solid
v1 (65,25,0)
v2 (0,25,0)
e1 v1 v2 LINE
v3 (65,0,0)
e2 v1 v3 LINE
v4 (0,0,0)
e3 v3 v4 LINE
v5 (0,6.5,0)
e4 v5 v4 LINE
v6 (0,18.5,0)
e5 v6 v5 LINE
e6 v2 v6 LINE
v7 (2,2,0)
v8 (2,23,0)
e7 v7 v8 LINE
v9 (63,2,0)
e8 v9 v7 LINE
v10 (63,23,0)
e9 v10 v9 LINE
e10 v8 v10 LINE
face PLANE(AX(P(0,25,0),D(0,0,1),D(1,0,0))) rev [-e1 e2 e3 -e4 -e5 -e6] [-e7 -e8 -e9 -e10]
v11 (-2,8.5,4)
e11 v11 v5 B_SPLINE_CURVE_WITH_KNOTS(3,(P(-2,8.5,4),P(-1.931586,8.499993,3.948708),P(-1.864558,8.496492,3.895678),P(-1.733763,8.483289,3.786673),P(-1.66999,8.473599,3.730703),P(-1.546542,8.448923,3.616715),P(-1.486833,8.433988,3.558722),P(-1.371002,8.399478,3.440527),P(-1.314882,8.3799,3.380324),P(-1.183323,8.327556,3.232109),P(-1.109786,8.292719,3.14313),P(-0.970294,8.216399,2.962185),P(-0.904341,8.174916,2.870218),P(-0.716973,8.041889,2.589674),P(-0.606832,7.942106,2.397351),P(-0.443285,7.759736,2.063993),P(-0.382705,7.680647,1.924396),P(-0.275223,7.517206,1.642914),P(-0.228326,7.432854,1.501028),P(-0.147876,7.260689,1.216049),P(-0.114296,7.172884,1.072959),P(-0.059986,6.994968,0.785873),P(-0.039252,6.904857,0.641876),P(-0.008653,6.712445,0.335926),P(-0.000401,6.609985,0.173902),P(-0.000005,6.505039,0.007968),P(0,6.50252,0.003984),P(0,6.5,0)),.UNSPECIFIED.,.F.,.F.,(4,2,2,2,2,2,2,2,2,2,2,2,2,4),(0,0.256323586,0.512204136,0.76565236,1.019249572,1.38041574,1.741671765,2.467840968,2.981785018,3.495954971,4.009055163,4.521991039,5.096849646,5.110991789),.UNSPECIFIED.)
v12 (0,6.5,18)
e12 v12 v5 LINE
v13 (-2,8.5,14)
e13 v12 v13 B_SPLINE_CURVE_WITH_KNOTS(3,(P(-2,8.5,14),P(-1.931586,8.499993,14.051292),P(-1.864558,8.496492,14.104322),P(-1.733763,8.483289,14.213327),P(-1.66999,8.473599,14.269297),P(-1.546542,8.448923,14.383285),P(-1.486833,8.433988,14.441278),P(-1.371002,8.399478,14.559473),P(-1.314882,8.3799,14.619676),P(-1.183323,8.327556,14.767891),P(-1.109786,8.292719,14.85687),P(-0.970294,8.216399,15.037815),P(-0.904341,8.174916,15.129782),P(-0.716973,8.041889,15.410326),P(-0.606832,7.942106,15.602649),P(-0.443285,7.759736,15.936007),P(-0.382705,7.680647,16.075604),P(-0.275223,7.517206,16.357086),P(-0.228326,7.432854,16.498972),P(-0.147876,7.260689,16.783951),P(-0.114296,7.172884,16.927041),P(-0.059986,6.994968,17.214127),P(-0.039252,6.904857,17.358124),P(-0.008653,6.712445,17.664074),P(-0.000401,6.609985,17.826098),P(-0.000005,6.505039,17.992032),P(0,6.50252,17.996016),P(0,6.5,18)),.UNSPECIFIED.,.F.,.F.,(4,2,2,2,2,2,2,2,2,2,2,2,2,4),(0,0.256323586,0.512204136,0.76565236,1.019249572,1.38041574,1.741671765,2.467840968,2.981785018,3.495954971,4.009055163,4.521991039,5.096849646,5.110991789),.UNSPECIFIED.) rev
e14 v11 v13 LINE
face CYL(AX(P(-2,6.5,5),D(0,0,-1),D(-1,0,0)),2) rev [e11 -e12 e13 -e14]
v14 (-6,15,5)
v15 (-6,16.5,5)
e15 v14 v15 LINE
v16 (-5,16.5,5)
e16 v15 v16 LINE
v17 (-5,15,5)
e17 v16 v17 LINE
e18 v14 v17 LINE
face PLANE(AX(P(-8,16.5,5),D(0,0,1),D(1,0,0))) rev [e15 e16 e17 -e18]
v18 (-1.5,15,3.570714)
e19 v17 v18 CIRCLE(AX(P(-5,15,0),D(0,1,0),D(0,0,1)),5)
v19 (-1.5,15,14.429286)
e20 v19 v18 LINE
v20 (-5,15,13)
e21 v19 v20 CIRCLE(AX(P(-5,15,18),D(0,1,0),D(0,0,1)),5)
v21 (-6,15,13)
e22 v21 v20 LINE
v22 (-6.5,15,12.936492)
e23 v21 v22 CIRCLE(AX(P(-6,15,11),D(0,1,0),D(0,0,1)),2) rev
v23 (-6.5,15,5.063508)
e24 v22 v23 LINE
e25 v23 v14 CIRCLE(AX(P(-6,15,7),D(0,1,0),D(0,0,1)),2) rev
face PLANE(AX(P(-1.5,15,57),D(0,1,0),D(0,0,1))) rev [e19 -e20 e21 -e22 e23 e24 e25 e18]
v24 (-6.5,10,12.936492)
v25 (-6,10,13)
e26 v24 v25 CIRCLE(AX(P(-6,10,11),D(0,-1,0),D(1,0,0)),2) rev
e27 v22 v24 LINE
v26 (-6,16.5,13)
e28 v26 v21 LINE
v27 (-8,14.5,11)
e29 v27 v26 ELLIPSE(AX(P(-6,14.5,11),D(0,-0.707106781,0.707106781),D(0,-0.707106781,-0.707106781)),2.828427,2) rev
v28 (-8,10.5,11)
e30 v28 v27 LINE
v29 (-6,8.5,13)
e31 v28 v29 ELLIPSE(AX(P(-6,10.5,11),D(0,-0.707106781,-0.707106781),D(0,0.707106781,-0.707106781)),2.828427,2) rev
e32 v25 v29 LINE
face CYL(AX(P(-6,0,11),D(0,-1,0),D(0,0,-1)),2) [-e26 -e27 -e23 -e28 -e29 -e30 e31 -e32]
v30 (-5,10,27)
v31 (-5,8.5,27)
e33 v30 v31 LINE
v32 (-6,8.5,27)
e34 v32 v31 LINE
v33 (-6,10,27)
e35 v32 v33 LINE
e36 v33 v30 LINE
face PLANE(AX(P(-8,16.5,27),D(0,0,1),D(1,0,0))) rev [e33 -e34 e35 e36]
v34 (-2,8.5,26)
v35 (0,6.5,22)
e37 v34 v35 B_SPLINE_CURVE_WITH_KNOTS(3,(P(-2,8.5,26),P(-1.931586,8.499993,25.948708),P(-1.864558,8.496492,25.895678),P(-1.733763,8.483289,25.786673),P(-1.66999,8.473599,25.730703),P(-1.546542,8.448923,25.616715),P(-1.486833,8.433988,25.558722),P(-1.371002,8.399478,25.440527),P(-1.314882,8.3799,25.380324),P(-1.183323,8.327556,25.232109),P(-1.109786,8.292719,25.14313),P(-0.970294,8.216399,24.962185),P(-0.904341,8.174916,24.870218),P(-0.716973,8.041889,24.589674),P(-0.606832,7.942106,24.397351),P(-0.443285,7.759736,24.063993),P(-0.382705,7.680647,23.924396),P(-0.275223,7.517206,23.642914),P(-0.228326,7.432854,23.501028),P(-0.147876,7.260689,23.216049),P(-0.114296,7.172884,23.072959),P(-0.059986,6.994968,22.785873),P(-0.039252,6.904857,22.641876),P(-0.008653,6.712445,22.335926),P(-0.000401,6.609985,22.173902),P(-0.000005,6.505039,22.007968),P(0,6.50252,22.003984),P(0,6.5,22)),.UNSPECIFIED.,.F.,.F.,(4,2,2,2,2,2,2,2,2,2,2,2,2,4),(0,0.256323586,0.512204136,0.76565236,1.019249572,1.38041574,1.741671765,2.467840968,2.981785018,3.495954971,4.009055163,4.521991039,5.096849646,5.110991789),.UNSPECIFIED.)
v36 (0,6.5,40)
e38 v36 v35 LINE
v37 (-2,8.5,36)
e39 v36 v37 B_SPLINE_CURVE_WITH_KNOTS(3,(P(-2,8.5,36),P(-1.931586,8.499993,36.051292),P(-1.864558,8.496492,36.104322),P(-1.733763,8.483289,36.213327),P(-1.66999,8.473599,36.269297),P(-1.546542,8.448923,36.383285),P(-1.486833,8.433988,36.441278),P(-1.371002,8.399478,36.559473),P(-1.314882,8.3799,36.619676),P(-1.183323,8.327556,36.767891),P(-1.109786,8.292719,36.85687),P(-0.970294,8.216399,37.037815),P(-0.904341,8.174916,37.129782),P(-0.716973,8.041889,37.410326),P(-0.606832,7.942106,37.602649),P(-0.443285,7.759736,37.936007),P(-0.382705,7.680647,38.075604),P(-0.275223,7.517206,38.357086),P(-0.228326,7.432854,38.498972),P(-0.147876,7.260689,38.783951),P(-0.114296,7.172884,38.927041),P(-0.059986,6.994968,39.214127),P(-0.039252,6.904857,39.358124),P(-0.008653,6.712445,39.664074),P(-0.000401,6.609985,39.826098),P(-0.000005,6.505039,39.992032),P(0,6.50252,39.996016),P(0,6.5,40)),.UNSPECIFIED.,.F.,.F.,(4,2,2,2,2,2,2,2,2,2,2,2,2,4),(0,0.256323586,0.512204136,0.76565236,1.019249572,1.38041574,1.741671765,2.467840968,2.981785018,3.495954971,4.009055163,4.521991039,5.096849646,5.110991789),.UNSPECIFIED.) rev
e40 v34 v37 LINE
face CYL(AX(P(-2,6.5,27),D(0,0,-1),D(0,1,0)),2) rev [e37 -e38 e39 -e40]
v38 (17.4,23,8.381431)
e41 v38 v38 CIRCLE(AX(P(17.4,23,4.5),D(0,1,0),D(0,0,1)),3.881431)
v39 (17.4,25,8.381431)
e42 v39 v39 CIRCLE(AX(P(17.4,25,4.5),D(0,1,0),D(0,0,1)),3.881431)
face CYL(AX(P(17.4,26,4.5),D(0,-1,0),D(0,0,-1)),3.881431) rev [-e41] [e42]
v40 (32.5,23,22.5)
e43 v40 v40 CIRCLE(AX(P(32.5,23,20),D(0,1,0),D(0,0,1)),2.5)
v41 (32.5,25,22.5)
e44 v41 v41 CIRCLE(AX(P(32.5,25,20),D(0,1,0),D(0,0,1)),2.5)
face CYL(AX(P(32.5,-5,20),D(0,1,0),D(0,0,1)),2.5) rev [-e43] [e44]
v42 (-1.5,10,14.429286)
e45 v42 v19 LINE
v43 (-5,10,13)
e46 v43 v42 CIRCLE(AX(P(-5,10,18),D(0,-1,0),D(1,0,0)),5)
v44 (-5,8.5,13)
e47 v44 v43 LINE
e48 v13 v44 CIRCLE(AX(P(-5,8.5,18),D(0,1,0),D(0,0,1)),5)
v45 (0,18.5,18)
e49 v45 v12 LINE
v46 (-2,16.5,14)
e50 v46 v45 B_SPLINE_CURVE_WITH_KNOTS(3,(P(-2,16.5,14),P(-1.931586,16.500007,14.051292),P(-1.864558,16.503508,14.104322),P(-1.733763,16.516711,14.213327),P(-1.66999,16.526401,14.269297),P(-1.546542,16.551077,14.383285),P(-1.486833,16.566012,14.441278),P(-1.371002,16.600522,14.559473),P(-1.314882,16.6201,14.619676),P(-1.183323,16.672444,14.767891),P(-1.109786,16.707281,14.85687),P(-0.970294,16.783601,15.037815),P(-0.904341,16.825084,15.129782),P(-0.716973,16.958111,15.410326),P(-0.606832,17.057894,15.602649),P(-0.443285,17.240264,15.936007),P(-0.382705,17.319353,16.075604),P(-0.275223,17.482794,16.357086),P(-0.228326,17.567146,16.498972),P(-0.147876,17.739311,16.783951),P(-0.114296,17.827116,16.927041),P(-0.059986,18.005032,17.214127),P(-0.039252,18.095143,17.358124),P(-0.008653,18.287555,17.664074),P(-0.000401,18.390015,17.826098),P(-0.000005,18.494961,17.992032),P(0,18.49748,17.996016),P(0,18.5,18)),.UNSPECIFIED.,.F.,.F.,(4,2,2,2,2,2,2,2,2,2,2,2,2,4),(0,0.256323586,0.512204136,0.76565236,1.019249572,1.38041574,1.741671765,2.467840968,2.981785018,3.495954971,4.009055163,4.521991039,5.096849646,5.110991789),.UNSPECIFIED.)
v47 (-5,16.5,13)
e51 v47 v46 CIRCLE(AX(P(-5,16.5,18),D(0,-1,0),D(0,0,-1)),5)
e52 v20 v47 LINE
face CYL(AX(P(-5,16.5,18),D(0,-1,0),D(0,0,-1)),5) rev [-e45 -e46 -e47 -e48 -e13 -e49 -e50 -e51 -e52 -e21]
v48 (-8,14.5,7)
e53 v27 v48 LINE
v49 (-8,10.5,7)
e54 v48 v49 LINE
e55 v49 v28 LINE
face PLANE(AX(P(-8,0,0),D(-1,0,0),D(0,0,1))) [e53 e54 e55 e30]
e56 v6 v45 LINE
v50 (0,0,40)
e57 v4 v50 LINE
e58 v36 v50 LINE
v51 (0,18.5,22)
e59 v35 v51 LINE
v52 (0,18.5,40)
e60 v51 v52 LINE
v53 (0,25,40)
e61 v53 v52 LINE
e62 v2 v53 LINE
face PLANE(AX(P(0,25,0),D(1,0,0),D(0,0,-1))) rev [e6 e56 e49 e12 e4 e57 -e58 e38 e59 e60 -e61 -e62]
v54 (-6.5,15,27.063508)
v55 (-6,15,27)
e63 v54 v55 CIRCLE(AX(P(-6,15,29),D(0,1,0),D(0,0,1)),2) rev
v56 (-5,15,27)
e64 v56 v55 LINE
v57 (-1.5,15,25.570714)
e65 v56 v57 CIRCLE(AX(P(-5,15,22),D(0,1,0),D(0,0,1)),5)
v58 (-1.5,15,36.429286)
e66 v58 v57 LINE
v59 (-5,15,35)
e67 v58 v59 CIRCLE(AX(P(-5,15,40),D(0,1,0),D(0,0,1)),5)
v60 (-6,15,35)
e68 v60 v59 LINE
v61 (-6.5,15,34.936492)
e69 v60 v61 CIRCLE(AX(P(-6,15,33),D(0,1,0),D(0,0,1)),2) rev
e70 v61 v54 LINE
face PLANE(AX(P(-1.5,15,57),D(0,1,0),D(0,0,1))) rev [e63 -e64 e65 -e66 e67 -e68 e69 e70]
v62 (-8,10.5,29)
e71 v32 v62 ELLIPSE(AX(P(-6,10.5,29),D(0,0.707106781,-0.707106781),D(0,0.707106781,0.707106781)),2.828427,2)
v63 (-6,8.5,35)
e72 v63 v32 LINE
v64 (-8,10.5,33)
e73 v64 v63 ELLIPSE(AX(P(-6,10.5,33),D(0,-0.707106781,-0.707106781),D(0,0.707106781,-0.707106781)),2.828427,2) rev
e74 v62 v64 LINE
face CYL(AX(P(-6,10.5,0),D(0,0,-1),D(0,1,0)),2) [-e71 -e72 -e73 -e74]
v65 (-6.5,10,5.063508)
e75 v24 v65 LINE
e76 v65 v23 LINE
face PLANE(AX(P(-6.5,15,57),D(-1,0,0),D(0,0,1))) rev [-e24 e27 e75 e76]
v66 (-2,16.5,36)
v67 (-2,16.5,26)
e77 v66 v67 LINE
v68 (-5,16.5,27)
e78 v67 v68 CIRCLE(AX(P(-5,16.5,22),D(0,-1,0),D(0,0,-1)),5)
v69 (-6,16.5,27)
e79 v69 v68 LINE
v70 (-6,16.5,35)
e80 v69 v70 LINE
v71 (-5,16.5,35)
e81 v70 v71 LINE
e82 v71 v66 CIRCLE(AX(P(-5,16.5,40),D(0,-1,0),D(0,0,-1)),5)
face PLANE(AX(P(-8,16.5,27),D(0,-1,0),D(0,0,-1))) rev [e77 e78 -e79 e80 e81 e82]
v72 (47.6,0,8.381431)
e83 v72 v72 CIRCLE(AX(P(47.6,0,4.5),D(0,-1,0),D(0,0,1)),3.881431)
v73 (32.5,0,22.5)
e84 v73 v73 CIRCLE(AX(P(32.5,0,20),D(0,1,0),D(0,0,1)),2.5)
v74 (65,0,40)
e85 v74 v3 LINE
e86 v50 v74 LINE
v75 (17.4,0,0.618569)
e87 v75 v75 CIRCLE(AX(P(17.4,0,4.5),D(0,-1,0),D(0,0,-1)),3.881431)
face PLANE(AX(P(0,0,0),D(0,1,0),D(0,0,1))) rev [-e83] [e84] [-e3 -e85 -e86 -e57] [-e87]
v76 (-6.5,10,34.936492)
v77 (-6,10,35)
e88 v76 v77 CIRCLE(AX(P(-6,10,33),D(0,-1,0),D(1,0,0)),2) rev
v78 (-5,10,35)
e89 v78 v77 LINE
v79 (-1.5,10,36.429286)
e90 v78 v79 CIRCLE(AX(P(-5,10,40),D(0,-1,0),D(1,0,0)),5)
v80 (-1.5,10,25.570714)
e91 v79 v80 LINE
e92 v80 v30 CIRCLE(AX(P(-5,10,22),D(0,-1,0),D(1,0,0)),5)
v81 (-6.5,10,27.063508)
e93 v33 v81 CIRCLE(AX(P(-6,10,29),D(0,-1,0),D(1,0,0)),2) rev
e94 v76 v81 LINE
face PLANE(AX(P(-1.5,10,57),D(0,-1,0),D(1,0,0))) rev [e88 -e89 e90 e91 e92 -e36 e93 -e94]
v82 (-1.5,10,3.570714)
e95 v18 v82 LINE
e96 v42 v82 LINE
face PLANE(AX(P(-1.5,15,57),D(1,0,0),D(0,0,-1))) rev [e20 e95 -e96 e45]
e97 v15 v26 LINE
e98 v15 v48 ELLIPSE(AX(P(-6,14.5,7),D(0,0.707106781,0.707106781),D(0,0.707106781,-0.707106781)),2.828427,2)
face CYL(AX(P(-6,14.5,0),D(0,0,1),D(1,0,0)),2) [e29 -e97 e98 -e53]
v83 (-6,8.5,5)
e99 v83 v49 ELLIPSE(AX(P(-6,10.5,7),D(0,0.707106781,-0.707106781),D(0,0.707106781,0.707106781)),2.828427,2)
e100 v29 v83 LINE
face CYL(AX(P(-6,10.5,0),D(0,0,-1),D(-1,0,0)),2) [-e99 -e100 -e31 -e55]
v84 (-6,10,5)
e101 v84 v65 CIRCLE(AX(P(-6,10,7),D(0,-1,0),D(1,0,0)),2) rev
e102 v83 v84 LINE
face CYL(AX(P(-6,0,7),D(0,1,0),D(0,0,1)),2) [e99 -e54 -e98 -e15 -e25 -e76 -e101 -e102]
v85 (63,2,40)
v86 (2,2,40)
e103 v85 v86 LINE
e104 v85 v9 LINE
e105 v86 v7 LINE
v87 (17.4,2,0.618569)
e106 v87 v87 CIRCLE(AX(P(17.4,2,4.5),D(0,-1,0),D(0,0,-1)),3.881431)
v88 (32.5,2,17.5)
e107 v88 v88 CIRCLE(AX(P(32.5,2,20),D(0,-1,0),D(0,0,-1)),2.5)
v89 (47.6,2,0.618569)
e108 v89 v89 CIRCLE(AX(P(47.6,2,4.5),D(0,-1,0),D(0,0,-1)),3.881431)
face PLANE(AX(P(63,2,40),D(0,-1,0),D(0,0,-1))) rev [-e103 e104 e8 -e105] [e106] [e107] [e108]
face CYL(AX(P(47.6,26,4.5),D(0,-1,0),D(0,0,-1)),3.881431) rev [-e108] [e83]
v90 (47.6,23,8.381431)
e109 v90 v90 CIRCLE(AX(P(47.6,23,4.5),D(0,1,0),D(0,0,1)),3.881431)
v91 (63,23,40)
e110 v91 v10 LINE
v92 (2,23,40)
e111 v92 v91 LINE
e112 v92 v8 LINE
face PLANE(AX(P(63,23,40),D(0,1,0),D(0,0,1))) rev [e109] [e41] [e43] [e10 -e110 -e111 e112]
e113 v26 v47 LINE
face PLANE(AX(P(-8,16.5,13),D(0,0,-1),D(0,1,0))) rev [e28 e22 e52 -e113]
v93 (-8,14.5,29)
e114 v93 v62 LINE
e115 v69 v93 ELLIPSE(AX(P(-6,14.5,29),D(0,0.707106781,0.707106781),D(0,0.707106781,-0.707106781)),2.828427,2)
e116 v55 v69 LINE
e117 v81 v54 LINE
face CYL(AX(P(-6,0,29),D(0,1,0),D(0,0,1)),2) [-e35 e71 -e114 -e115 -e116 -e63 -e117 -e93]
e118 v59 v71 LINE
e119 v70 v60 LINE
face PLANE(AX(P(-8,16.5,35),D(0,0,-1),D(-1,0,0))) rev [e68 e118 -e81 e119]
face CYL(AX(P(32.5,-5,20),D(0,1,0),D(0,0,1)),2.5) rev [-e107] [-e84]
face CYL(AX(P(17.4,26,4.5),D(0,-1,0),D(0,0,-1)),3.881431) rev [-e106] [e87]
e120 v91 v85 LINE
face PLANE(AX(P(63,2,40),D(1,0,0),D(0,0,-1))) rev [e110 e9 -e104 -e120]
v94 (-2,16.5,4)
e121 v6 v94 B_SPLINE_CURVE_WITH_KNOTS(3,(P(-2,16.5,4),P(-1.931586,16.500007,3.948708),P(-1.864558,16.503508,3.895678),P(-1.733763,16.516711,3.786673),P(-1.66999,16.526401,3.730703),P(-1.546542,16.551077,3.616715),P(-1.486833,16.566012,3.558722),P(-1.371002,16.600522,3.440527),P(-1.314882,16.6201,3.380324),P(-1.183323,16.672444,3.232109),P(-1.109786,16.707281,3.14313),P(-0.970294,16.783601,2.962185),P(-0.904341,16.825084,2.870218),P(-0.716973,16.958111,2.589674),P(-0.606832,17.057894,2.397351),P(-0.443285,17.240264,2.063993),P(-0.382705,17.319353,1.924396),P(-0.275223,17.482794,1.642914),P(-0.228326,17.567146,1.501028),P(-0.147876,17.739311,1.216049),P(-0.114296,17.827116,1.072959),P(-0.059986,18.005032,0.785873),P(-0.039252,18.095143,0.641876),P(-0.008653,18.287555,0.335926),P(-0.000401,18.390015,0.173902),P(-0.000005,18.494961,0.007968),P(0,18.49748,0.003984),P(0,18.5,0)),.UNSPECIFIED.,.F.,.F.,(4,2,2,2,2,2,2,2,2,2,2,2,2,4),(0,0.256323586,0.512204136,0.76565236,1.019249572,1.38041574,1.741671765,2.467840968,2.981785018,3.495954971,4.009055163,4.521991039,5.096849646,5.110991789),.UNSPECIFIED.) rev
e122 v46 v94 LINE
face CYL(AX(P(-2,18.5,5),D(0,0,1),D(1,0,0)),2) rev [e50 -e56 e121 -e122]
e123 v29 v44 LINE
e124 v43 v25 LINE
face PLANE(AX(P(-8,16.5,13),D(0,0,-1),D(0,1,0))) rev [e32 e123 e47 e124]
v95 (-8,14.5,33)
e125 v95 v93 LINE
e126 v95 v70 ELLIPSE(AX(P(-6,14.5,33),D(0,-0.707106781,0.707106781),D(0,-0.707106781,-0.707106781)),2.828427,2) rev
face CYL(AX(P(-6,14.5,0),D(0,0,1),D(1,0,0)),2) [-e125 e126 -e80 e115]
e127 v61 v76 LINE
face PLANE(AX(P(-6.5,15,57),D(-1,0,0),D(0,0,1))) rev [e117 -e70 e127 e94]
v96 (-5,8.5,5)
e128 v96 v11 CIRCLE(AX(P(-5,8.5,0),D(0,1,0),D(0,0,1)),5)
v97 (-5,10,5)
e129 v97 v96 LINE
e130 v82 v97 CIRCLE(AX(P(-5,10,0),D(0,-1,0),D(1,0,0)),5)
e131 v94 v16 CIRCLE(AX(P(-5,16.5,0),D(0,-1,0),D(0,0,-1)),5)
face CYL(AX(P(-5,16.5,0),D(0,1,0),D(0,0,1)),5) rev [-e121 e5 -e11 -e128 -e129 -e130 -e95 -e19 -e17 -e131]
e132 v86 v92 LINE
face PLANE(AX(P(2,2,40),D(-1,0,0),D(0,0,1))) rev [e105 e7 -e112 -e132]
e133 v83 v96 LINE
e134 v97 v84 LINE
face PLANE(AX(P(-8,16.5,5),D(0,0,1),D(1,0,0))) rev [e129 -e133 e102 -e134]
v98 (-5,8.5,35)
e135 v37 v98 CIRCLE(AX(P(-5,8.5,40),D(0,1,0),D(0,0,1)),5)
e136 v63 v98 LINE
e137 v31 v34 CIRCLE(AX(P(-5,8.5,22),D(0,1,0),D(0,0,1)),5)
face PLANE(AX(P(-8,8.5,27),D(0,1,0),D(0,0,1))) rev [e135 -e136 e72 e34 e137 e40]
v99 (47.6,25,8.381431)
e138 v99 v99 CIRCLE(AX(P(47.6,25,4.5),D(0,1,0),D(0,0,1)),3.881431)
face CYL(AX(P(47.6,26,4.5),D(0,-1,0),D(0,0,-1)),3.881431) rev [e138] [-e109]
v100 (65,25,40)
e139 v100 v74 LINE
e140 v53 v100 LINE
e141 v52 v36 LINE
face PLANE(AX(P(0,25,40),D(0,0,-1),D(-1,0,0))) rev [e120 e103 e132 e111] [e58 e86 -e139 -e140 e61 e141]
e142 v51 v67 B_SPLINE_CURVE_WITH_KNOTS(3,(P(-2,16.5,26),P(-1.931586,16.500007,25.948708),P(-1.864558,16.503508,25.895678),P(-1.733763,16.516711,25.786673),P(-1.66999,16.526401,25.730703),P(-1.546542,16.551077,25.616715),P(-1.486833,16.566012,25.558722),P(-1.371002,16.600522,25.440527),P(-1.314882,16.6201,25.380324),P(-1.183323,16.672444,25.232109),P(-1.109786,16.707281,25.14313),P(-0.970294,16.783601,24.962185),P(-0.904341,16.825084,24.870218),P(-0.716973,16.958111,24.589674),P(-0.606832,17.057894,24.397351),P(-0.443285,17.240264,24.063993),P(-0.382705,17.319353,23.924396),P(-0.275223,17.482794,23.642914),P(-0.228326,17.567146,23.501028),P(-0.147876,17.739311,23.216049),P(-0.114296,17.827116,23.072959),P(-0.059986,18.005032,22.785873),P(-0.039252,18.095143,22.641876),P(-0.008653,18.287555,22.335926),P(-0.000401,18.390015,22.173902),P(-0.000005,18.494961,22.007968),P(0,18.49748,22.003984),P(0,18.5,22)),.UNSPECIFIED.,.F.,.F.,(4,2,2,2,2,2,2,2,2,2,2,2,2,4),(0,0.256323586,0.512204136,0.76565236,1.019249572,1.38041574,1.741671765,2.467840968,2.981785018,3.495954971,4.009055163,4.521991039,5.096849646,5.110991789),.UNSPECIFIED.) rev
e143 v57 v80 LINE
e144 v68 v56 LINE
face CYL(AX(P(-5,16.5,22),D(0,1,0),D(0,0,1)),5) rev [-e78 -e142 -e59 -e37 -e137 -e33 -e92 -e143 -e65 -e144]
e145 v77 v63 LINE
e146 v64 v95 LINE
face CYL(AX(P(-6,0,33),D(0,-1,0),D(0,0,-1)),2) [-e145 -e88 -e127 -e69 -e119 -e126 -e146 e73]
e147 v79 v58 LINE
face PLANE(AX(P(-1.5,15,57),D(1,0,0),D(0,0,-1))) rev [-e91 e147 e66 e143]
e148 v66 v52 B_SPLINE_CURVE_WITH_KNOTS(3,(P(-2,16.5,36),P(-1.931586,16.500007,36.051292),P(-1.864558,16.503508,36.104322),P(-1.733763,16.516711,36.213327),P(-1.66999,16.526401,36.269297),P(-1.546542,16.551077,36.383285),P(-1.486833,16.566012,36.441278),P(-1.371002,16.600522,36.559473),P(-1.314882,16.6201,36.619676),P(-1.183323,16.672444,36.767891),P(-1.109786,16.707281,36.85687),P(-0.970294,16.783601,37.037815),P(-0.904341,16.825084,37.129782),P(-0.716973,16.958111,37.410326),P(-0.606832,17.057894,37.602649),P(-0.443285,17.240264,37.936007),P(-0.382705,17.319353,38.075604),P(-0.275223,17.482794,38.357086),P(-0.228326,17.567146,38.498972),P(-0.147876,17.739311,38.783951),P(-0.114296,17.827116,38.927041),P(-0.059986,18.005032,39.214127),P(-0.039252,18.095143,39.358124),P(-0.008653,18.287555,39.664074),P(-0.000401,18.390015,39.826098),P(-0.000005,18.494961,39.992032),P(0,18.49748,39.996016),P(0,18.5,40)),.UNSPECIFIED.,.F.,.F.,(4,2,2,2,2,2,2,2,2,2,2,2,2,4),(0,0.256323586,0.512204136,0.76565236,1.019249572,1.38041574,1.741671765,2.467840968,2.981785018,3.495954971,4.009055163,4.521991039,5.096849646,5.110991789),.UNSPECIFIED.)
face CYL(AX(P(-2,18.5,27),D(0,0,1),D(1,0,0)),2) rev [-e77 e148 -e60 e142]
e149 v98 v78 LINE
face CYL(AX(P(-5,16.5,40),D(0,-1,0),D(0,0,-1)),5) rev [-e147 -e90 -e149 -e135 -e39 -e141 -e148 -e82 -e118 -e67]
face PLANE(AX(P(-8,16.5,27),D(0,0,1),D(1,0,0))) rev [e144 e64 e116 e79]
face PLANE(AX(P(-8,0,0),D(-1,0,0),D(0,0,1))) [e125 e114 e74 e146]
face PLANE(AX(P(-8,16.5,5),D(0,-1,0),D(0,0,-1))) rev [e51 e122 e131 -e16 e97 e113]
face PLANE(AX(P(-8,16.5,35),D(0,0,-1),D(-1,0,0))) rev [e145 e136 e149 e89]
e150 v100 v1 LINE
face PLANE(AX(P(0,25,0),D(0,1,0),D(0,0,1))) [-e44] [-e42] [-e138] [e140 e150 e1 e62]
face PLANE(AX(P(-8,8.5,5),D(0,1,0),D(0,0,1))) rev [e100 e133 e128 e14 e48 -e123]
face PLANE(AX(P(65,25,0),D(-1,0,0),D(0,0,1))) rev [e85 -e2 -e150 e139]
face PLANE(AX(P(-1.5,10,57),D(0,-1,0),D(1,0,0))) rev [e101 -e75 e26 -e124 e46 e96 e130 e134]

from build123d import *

# Parameters (mm, degrees)
SKETCH1_W           = 65
SKETCH1_H           = 40
BOSS_EXTRUDE1_DEPTH = 25
SKETCH8_W           = 61
SKETCH8_H           = 21
CUT_EXTRUDE1_DEPTH  = 40
SKETCH9_R           = 2.5
CUT_EXTRUDE2_DEPTH  = 30
SKETCH10_R          = 3.881431072
CUT_EXTRUDE3_DEPTH  = 26
SKETCH11_W          = 8
SKETCH11_H          = 8
BOSS_EXTRUDE2_DEPTH = 8
SKETCH12_W          = 5
SKETCH12_H          = 5
CUT_EXTRUDE4_DEPTH  = 52
FILLET1_R           = 2
FILLET2_START       = 6.4999999
FILLET2_DEPTH       = 12.0000001
FILLET2_START_2     = 7.897261538
FILLET2_2_DEPTH     = 2.102738462
FILLET2_START_3     = 15
FILLET2_3_DEPTH     = 2.089446154
FILLET2_START_4     = -1
FILLET2_4_DEPTH     = 42
FILLET3_START       = 5
FILLET3_DEPTH       = 30
FILLET3_START_2     = 8
FILLET3_2_DEPTH     = 9


with BuildPart() as part:
    # Sketch1 → Boss-Extrude1 (new body)
    with BuildSketch(Plane(origin=(0, 0, 0), x_dir=(1, 0, 0), z_dir=(0, 1, 0))):
        with Locations((32.5, -20)):
            Rectangle(SKETCH1_W, SKETCH1_H)
    extrude(amount=BOSS_EXTRUDE1_DEPTH)

    # Sketch8 → Cut-Extrude1 (cut)
    with BuildSketch(Plane(origin=(0, 0, 0), x_dir=(-1, 0, 0), z_dir=(0, 0, -1))):
        with Locations((-32.5, 12.5)):
            Rectangle(SKETCH8_W, SKETCH8_H)
    extrude(amount=-CUT_EXTRUDE1_DEPTH, mode=Mode.SUBTRACT)

    # Sketch9 → Cut-Extrude2 (cut)
    with BuildSketch(Plane(origin=(0, 25, 0), x_dir=(1, 0, 0), z_dir=(0, 1, 0))):
        with Locations(Location((32.5, -20, 0), (0, 0, 270))):
            Circle(SKETCH9_R)
    extrude(amount=-CUT_EXTRUDE2_DEPTH, mode=Mode.SUBTRACT)

    # Sketch10 → Cut-Extrude3 (cut)
    with BuildSketch(Plane.XZ):
        with Locations(Location((17.4, 4.5, 0), (0, 0, 90))):
            Circle(SKETCH10_R)
        with Locations(Location((47.6, 4.5, 0), (0, 0, 90))):
            Circle(SKETCH10_R)
    extrude(amount=-CUT_EXTRUDE3_DEPTH, mode=Mode.SUBTRACT)

    # Sketch11 → Boss-Extrude2 (add)
    with BuildSketch(Plane.ZY):
        with Locations((9, 12.5)):
            Rectangle(SKETCH11_W, SKETCH11_H)
        with Locations((31, 12.5)):
            Rectangle(SKETCH11_W, SKETCH11_H)
    extrude(amount=BOSS_EXTRUDE2_DEPTH)

    # Sketch12 → Cut-Extrude4 (cut)
    with BuildSketch(Plane(origin=(0, 0, 5), x_dir=(-1, 0, 0), z_dir=(0, 0, -1))):
        with Locations((4, 12.5)):
            Rectangle(SKETCH12_W, SKETCH12_H)
    extrude(amount=-CUT_EXTRUDE4_DEPTH, mode=Mode.SUBTRACT)

    # Fillet1
    fillet1_edges = [part.edges().sort_by_distance(p)[0] for p in [
        (0, 8.5, 9),
        (0, 16.5, 9),
        (0, 8.5, 31),
        (0, 16.5, 31),
    ]]
    fillet(fillet1_edges, radius=FILLET1_R)

    # Fillet2: read off the stored shape, not the designer's step
    # Fillet2 outline → Fillet2 (add)
    with BuildSketch(Plane(origin=(0, 0, 0), x_dir=(1, 0, 0), z_dir=(0, 1, 0)).offset(FILLET2_START)):
        with BuildLine():
            ThreePointArc((-1.5, -14.429285786), (-0.390227771, -16.063508327), (0, -18))
            Line((0, -18), (0, -13))
            Line((0, -13), (-1.5, -13))
            Line((-1.5, -13), (-1.5, -14.429285786))
        make_face()
        with BuildLine():
            Line((-1.5, -35), (-1.5, -36.429285786))
            ThreePointArc((-1.5, -36.429285786), (-0.390227771, -38.063508327), (0, -40))
            Line((0, -40), (0, -35))
            Line((0, -35), (-1.5, -35))
        make_face()
        with BuildLine():
            Line((-1.5, -25.570714214), (-1.5, -27))
            Line((-1.5, -27), (0, -27))
            Line((0, -27), (0, -22))
            ThreePointArc((0, -22), (-0.390227771, -23.936491673), (-1.5, -25.570714214))
        make_face()
        with BuildLine():
            Line((-1.5, -5), (0, -5))
            Line((0, -5), (0, 0))
            ThreePointArc((0, 0), (-0.390227771, -1.936491673), (-1.5, -3.570714214))
            Line((-1.5, -3.570714214), (-1.5, -5))
        make_face()
    extrude(amount=FILLET2_DEPTH)

    # Fillet2 2 outline → Fillet2 2 (add)
    with BuildSketch(Plane(origin=(0, 0, 0), x_dir=(1, 0, 0), z_dir=(0, 1, 0)).offset(FILLET2_START_2)):
        with BuildLine():
            ThreePointArc((-5, -35), (-3.109705191, -35.371092404), (-1.5, -36.429285786))
            Line((-1.5, -36.429285786), (-1.5, -35))
            Line((-1.5, -35), (-5, -35))
        make_face()
        with BuildLine():
            Line((-5, -27), (-1.5, -27))
            Line((-1.5, -27), (-1.5, -25.570714214))
            ThreePointArc((-1.5, -25.570714214), (-3.109705191, -26.628907596), (-5, -27))
        make_face()
        with BuildLine():
            ThreePointArc((-5, -13), (-3.109705191, -13.371092404), (-1.5, -14.429285786))
            Line((-1.5, -14.429285786), (-1.5, -13))
            Line((-1.5, -13), (-5, -13))
        make_face()
        with BuildLine():
            Line((-5, -5), (-1.5, -5))
            Line((-1.5, -5), (-1.5, -3.570714214))
            ThreePointArc((-1.5, -3.570714214), (-3.109705191, -4.628907596), (-5, -5))
        make_face()
    extrude(amount=FILLET2_2_DEPTH)

    # Fillet2 3 outline → Fillet2 3 (add)
    with BuildSketch(Plane(origin=(0, 0, 0), x_dir=(1, 0, 0), z_dir=(0, 1, 0)).offset(FILLET2_START_3)):
        with BuildLine():
            ThreePointArc((-5, -35), (-3.109705191, -35.371092404), (-1.5, -36.429285786))
            Line((-1.5, -36.429285786), (-1.5, -35))
            Line((-1.5, -35), (-5, -35))
        make_face()
        with BuildLine():
            Line((-5, -27), (-1.5, -27))
            Line((-1.5, -27), (-1.5, -25.570714214))
            ThreePointArc((-1.5, -25.570714214), (-3.109705191, -26.628907596), (-5, -27))
        make_face()
        with BuildLine():
            ThreePointArc((-5, -13), (-3.109705191, -13.371092404), (-1.5, -14.429285786))
            Line((-1.5, -14.429285786), (-1.5, -13))
            Line((-1.5, -13), (-5, -13))
        make_face()
        with BuildLine():
            Line((-5, -5), (-1.5, -5))
            Line((-1.5, -5), (-1.5, -3.570714214))
            ThreePointArc((-1.5, -3.570714214), (-3.109705191, -4.628907596), (-5, -5))
        make_face()
    extrude(amount=FILLET2_3_DEPTH)

    # Fillet2 4 outline → Fillet2 4 (cut)
    with BuildSketch(Plane.XY.offset(FILLET2_START_4)):
        with BuildLine():
            Line((-5, 16.5), (-2, 16.5))
            ThreePointArc((-2, 16.5), (-0.585786438, 17.085786438), (0, 18.5))
            Line((0, 18.5), (-1.5, 18.5))
            Line((-1.5, 18.5), (-1.5, 17.089446154))
            Line((-1.5, 17.089446154), (-5, 17.089446154))
            Line((-5, 17.089446154), (-5, 16.5))
        make_face()
        with BuildLine():
            Line((-5, 7.897261538), (-1.5, 7.897261538))
            Line((-1.5, 7.897261538), (-1.5, 6.4999999))
            Line((-1.5, 6.4999999), (0, 6.49999995))
            ThreePointArc((0, 6.49999995), (-0.58578642, 7.914213545), (-2, 8.5))
            Line((-2, 8.5), (-5, 8.5))
            Line((-5, 8.5), (-5, 7.897261538))
        make_face()
    extrude(amount=FILLET2_4_DEPTH, mode=Mode.SUBTRACT)

    # Fillet3: read off the stored shape, not the designer's step
    # Fillet3 outline → Fillet3 (cut)
    with BuildSketch(Plane.XY.offset(FILLET3_START)):
        with BuildLine():
            Line((-8, 8.5), (-6, 8.5))
            ThreePointArc((-6, 8.5), (-7.414213562, 9.085786438), (-8, 10.5))
            Line((-8, 10.5), (-8, 8.5))
        make_face()
        with BuildLine():
            Line((-8, 16.5), (-8, 14.5))
            ThreePointArc((-8, 14.5), (-7.414213562, 15.914213562), (-6, 16.5))
            Line((-6, 16.5), (-8, 16.5))
        make_face()
    extrude(amount=FILLET3_DEPTH, mode=Mode.SUBTRACT)

    # Fillet3 2 outline → Fillet3 2 (cut)
    with BuildSketch(Plane(origin=(0, 0, 0), x_dir=(1, 0, 0), z_dir=(0, 1, 0)).offset(FILLET3_START_2)):
        with BuildLine():
            Line((-8, -35), (-6, -35))
            ThreePointArc((-6, -35), (-7.414213562, -34.414213562), (-8, -33))
            Line((-8, -33), (-8, -35))
        make_face()
        with BuildLine():
            Line((-8, -27), (-8, -29))
            ThreePointArc((-8, -29), (-7.414213562, -27.585786438), (-6, -27))
            Line((-6, -27), (-8, -27))
        make_face()
        with BuildLine():
            Line((-8, -13), (-6, -13))
            ThreePointArc((-6, -13), (-7.414213562, -12.414213562), (-8, -11))
            Line((-8, -11), (-8, -13))
        make_face()
        with BuildLine():
            Line((-8, -5), (-8, -7))
            ThreePointArc((-8, -7), (-7.414213562, -5.585786438), (-6, -5))
            Line((-6, -5), (-8, -5))
        make_face()
    extrude(amount=FILLET3_2_DEPTH, mode=Mode.SUBTRACT)


solid = part.part
